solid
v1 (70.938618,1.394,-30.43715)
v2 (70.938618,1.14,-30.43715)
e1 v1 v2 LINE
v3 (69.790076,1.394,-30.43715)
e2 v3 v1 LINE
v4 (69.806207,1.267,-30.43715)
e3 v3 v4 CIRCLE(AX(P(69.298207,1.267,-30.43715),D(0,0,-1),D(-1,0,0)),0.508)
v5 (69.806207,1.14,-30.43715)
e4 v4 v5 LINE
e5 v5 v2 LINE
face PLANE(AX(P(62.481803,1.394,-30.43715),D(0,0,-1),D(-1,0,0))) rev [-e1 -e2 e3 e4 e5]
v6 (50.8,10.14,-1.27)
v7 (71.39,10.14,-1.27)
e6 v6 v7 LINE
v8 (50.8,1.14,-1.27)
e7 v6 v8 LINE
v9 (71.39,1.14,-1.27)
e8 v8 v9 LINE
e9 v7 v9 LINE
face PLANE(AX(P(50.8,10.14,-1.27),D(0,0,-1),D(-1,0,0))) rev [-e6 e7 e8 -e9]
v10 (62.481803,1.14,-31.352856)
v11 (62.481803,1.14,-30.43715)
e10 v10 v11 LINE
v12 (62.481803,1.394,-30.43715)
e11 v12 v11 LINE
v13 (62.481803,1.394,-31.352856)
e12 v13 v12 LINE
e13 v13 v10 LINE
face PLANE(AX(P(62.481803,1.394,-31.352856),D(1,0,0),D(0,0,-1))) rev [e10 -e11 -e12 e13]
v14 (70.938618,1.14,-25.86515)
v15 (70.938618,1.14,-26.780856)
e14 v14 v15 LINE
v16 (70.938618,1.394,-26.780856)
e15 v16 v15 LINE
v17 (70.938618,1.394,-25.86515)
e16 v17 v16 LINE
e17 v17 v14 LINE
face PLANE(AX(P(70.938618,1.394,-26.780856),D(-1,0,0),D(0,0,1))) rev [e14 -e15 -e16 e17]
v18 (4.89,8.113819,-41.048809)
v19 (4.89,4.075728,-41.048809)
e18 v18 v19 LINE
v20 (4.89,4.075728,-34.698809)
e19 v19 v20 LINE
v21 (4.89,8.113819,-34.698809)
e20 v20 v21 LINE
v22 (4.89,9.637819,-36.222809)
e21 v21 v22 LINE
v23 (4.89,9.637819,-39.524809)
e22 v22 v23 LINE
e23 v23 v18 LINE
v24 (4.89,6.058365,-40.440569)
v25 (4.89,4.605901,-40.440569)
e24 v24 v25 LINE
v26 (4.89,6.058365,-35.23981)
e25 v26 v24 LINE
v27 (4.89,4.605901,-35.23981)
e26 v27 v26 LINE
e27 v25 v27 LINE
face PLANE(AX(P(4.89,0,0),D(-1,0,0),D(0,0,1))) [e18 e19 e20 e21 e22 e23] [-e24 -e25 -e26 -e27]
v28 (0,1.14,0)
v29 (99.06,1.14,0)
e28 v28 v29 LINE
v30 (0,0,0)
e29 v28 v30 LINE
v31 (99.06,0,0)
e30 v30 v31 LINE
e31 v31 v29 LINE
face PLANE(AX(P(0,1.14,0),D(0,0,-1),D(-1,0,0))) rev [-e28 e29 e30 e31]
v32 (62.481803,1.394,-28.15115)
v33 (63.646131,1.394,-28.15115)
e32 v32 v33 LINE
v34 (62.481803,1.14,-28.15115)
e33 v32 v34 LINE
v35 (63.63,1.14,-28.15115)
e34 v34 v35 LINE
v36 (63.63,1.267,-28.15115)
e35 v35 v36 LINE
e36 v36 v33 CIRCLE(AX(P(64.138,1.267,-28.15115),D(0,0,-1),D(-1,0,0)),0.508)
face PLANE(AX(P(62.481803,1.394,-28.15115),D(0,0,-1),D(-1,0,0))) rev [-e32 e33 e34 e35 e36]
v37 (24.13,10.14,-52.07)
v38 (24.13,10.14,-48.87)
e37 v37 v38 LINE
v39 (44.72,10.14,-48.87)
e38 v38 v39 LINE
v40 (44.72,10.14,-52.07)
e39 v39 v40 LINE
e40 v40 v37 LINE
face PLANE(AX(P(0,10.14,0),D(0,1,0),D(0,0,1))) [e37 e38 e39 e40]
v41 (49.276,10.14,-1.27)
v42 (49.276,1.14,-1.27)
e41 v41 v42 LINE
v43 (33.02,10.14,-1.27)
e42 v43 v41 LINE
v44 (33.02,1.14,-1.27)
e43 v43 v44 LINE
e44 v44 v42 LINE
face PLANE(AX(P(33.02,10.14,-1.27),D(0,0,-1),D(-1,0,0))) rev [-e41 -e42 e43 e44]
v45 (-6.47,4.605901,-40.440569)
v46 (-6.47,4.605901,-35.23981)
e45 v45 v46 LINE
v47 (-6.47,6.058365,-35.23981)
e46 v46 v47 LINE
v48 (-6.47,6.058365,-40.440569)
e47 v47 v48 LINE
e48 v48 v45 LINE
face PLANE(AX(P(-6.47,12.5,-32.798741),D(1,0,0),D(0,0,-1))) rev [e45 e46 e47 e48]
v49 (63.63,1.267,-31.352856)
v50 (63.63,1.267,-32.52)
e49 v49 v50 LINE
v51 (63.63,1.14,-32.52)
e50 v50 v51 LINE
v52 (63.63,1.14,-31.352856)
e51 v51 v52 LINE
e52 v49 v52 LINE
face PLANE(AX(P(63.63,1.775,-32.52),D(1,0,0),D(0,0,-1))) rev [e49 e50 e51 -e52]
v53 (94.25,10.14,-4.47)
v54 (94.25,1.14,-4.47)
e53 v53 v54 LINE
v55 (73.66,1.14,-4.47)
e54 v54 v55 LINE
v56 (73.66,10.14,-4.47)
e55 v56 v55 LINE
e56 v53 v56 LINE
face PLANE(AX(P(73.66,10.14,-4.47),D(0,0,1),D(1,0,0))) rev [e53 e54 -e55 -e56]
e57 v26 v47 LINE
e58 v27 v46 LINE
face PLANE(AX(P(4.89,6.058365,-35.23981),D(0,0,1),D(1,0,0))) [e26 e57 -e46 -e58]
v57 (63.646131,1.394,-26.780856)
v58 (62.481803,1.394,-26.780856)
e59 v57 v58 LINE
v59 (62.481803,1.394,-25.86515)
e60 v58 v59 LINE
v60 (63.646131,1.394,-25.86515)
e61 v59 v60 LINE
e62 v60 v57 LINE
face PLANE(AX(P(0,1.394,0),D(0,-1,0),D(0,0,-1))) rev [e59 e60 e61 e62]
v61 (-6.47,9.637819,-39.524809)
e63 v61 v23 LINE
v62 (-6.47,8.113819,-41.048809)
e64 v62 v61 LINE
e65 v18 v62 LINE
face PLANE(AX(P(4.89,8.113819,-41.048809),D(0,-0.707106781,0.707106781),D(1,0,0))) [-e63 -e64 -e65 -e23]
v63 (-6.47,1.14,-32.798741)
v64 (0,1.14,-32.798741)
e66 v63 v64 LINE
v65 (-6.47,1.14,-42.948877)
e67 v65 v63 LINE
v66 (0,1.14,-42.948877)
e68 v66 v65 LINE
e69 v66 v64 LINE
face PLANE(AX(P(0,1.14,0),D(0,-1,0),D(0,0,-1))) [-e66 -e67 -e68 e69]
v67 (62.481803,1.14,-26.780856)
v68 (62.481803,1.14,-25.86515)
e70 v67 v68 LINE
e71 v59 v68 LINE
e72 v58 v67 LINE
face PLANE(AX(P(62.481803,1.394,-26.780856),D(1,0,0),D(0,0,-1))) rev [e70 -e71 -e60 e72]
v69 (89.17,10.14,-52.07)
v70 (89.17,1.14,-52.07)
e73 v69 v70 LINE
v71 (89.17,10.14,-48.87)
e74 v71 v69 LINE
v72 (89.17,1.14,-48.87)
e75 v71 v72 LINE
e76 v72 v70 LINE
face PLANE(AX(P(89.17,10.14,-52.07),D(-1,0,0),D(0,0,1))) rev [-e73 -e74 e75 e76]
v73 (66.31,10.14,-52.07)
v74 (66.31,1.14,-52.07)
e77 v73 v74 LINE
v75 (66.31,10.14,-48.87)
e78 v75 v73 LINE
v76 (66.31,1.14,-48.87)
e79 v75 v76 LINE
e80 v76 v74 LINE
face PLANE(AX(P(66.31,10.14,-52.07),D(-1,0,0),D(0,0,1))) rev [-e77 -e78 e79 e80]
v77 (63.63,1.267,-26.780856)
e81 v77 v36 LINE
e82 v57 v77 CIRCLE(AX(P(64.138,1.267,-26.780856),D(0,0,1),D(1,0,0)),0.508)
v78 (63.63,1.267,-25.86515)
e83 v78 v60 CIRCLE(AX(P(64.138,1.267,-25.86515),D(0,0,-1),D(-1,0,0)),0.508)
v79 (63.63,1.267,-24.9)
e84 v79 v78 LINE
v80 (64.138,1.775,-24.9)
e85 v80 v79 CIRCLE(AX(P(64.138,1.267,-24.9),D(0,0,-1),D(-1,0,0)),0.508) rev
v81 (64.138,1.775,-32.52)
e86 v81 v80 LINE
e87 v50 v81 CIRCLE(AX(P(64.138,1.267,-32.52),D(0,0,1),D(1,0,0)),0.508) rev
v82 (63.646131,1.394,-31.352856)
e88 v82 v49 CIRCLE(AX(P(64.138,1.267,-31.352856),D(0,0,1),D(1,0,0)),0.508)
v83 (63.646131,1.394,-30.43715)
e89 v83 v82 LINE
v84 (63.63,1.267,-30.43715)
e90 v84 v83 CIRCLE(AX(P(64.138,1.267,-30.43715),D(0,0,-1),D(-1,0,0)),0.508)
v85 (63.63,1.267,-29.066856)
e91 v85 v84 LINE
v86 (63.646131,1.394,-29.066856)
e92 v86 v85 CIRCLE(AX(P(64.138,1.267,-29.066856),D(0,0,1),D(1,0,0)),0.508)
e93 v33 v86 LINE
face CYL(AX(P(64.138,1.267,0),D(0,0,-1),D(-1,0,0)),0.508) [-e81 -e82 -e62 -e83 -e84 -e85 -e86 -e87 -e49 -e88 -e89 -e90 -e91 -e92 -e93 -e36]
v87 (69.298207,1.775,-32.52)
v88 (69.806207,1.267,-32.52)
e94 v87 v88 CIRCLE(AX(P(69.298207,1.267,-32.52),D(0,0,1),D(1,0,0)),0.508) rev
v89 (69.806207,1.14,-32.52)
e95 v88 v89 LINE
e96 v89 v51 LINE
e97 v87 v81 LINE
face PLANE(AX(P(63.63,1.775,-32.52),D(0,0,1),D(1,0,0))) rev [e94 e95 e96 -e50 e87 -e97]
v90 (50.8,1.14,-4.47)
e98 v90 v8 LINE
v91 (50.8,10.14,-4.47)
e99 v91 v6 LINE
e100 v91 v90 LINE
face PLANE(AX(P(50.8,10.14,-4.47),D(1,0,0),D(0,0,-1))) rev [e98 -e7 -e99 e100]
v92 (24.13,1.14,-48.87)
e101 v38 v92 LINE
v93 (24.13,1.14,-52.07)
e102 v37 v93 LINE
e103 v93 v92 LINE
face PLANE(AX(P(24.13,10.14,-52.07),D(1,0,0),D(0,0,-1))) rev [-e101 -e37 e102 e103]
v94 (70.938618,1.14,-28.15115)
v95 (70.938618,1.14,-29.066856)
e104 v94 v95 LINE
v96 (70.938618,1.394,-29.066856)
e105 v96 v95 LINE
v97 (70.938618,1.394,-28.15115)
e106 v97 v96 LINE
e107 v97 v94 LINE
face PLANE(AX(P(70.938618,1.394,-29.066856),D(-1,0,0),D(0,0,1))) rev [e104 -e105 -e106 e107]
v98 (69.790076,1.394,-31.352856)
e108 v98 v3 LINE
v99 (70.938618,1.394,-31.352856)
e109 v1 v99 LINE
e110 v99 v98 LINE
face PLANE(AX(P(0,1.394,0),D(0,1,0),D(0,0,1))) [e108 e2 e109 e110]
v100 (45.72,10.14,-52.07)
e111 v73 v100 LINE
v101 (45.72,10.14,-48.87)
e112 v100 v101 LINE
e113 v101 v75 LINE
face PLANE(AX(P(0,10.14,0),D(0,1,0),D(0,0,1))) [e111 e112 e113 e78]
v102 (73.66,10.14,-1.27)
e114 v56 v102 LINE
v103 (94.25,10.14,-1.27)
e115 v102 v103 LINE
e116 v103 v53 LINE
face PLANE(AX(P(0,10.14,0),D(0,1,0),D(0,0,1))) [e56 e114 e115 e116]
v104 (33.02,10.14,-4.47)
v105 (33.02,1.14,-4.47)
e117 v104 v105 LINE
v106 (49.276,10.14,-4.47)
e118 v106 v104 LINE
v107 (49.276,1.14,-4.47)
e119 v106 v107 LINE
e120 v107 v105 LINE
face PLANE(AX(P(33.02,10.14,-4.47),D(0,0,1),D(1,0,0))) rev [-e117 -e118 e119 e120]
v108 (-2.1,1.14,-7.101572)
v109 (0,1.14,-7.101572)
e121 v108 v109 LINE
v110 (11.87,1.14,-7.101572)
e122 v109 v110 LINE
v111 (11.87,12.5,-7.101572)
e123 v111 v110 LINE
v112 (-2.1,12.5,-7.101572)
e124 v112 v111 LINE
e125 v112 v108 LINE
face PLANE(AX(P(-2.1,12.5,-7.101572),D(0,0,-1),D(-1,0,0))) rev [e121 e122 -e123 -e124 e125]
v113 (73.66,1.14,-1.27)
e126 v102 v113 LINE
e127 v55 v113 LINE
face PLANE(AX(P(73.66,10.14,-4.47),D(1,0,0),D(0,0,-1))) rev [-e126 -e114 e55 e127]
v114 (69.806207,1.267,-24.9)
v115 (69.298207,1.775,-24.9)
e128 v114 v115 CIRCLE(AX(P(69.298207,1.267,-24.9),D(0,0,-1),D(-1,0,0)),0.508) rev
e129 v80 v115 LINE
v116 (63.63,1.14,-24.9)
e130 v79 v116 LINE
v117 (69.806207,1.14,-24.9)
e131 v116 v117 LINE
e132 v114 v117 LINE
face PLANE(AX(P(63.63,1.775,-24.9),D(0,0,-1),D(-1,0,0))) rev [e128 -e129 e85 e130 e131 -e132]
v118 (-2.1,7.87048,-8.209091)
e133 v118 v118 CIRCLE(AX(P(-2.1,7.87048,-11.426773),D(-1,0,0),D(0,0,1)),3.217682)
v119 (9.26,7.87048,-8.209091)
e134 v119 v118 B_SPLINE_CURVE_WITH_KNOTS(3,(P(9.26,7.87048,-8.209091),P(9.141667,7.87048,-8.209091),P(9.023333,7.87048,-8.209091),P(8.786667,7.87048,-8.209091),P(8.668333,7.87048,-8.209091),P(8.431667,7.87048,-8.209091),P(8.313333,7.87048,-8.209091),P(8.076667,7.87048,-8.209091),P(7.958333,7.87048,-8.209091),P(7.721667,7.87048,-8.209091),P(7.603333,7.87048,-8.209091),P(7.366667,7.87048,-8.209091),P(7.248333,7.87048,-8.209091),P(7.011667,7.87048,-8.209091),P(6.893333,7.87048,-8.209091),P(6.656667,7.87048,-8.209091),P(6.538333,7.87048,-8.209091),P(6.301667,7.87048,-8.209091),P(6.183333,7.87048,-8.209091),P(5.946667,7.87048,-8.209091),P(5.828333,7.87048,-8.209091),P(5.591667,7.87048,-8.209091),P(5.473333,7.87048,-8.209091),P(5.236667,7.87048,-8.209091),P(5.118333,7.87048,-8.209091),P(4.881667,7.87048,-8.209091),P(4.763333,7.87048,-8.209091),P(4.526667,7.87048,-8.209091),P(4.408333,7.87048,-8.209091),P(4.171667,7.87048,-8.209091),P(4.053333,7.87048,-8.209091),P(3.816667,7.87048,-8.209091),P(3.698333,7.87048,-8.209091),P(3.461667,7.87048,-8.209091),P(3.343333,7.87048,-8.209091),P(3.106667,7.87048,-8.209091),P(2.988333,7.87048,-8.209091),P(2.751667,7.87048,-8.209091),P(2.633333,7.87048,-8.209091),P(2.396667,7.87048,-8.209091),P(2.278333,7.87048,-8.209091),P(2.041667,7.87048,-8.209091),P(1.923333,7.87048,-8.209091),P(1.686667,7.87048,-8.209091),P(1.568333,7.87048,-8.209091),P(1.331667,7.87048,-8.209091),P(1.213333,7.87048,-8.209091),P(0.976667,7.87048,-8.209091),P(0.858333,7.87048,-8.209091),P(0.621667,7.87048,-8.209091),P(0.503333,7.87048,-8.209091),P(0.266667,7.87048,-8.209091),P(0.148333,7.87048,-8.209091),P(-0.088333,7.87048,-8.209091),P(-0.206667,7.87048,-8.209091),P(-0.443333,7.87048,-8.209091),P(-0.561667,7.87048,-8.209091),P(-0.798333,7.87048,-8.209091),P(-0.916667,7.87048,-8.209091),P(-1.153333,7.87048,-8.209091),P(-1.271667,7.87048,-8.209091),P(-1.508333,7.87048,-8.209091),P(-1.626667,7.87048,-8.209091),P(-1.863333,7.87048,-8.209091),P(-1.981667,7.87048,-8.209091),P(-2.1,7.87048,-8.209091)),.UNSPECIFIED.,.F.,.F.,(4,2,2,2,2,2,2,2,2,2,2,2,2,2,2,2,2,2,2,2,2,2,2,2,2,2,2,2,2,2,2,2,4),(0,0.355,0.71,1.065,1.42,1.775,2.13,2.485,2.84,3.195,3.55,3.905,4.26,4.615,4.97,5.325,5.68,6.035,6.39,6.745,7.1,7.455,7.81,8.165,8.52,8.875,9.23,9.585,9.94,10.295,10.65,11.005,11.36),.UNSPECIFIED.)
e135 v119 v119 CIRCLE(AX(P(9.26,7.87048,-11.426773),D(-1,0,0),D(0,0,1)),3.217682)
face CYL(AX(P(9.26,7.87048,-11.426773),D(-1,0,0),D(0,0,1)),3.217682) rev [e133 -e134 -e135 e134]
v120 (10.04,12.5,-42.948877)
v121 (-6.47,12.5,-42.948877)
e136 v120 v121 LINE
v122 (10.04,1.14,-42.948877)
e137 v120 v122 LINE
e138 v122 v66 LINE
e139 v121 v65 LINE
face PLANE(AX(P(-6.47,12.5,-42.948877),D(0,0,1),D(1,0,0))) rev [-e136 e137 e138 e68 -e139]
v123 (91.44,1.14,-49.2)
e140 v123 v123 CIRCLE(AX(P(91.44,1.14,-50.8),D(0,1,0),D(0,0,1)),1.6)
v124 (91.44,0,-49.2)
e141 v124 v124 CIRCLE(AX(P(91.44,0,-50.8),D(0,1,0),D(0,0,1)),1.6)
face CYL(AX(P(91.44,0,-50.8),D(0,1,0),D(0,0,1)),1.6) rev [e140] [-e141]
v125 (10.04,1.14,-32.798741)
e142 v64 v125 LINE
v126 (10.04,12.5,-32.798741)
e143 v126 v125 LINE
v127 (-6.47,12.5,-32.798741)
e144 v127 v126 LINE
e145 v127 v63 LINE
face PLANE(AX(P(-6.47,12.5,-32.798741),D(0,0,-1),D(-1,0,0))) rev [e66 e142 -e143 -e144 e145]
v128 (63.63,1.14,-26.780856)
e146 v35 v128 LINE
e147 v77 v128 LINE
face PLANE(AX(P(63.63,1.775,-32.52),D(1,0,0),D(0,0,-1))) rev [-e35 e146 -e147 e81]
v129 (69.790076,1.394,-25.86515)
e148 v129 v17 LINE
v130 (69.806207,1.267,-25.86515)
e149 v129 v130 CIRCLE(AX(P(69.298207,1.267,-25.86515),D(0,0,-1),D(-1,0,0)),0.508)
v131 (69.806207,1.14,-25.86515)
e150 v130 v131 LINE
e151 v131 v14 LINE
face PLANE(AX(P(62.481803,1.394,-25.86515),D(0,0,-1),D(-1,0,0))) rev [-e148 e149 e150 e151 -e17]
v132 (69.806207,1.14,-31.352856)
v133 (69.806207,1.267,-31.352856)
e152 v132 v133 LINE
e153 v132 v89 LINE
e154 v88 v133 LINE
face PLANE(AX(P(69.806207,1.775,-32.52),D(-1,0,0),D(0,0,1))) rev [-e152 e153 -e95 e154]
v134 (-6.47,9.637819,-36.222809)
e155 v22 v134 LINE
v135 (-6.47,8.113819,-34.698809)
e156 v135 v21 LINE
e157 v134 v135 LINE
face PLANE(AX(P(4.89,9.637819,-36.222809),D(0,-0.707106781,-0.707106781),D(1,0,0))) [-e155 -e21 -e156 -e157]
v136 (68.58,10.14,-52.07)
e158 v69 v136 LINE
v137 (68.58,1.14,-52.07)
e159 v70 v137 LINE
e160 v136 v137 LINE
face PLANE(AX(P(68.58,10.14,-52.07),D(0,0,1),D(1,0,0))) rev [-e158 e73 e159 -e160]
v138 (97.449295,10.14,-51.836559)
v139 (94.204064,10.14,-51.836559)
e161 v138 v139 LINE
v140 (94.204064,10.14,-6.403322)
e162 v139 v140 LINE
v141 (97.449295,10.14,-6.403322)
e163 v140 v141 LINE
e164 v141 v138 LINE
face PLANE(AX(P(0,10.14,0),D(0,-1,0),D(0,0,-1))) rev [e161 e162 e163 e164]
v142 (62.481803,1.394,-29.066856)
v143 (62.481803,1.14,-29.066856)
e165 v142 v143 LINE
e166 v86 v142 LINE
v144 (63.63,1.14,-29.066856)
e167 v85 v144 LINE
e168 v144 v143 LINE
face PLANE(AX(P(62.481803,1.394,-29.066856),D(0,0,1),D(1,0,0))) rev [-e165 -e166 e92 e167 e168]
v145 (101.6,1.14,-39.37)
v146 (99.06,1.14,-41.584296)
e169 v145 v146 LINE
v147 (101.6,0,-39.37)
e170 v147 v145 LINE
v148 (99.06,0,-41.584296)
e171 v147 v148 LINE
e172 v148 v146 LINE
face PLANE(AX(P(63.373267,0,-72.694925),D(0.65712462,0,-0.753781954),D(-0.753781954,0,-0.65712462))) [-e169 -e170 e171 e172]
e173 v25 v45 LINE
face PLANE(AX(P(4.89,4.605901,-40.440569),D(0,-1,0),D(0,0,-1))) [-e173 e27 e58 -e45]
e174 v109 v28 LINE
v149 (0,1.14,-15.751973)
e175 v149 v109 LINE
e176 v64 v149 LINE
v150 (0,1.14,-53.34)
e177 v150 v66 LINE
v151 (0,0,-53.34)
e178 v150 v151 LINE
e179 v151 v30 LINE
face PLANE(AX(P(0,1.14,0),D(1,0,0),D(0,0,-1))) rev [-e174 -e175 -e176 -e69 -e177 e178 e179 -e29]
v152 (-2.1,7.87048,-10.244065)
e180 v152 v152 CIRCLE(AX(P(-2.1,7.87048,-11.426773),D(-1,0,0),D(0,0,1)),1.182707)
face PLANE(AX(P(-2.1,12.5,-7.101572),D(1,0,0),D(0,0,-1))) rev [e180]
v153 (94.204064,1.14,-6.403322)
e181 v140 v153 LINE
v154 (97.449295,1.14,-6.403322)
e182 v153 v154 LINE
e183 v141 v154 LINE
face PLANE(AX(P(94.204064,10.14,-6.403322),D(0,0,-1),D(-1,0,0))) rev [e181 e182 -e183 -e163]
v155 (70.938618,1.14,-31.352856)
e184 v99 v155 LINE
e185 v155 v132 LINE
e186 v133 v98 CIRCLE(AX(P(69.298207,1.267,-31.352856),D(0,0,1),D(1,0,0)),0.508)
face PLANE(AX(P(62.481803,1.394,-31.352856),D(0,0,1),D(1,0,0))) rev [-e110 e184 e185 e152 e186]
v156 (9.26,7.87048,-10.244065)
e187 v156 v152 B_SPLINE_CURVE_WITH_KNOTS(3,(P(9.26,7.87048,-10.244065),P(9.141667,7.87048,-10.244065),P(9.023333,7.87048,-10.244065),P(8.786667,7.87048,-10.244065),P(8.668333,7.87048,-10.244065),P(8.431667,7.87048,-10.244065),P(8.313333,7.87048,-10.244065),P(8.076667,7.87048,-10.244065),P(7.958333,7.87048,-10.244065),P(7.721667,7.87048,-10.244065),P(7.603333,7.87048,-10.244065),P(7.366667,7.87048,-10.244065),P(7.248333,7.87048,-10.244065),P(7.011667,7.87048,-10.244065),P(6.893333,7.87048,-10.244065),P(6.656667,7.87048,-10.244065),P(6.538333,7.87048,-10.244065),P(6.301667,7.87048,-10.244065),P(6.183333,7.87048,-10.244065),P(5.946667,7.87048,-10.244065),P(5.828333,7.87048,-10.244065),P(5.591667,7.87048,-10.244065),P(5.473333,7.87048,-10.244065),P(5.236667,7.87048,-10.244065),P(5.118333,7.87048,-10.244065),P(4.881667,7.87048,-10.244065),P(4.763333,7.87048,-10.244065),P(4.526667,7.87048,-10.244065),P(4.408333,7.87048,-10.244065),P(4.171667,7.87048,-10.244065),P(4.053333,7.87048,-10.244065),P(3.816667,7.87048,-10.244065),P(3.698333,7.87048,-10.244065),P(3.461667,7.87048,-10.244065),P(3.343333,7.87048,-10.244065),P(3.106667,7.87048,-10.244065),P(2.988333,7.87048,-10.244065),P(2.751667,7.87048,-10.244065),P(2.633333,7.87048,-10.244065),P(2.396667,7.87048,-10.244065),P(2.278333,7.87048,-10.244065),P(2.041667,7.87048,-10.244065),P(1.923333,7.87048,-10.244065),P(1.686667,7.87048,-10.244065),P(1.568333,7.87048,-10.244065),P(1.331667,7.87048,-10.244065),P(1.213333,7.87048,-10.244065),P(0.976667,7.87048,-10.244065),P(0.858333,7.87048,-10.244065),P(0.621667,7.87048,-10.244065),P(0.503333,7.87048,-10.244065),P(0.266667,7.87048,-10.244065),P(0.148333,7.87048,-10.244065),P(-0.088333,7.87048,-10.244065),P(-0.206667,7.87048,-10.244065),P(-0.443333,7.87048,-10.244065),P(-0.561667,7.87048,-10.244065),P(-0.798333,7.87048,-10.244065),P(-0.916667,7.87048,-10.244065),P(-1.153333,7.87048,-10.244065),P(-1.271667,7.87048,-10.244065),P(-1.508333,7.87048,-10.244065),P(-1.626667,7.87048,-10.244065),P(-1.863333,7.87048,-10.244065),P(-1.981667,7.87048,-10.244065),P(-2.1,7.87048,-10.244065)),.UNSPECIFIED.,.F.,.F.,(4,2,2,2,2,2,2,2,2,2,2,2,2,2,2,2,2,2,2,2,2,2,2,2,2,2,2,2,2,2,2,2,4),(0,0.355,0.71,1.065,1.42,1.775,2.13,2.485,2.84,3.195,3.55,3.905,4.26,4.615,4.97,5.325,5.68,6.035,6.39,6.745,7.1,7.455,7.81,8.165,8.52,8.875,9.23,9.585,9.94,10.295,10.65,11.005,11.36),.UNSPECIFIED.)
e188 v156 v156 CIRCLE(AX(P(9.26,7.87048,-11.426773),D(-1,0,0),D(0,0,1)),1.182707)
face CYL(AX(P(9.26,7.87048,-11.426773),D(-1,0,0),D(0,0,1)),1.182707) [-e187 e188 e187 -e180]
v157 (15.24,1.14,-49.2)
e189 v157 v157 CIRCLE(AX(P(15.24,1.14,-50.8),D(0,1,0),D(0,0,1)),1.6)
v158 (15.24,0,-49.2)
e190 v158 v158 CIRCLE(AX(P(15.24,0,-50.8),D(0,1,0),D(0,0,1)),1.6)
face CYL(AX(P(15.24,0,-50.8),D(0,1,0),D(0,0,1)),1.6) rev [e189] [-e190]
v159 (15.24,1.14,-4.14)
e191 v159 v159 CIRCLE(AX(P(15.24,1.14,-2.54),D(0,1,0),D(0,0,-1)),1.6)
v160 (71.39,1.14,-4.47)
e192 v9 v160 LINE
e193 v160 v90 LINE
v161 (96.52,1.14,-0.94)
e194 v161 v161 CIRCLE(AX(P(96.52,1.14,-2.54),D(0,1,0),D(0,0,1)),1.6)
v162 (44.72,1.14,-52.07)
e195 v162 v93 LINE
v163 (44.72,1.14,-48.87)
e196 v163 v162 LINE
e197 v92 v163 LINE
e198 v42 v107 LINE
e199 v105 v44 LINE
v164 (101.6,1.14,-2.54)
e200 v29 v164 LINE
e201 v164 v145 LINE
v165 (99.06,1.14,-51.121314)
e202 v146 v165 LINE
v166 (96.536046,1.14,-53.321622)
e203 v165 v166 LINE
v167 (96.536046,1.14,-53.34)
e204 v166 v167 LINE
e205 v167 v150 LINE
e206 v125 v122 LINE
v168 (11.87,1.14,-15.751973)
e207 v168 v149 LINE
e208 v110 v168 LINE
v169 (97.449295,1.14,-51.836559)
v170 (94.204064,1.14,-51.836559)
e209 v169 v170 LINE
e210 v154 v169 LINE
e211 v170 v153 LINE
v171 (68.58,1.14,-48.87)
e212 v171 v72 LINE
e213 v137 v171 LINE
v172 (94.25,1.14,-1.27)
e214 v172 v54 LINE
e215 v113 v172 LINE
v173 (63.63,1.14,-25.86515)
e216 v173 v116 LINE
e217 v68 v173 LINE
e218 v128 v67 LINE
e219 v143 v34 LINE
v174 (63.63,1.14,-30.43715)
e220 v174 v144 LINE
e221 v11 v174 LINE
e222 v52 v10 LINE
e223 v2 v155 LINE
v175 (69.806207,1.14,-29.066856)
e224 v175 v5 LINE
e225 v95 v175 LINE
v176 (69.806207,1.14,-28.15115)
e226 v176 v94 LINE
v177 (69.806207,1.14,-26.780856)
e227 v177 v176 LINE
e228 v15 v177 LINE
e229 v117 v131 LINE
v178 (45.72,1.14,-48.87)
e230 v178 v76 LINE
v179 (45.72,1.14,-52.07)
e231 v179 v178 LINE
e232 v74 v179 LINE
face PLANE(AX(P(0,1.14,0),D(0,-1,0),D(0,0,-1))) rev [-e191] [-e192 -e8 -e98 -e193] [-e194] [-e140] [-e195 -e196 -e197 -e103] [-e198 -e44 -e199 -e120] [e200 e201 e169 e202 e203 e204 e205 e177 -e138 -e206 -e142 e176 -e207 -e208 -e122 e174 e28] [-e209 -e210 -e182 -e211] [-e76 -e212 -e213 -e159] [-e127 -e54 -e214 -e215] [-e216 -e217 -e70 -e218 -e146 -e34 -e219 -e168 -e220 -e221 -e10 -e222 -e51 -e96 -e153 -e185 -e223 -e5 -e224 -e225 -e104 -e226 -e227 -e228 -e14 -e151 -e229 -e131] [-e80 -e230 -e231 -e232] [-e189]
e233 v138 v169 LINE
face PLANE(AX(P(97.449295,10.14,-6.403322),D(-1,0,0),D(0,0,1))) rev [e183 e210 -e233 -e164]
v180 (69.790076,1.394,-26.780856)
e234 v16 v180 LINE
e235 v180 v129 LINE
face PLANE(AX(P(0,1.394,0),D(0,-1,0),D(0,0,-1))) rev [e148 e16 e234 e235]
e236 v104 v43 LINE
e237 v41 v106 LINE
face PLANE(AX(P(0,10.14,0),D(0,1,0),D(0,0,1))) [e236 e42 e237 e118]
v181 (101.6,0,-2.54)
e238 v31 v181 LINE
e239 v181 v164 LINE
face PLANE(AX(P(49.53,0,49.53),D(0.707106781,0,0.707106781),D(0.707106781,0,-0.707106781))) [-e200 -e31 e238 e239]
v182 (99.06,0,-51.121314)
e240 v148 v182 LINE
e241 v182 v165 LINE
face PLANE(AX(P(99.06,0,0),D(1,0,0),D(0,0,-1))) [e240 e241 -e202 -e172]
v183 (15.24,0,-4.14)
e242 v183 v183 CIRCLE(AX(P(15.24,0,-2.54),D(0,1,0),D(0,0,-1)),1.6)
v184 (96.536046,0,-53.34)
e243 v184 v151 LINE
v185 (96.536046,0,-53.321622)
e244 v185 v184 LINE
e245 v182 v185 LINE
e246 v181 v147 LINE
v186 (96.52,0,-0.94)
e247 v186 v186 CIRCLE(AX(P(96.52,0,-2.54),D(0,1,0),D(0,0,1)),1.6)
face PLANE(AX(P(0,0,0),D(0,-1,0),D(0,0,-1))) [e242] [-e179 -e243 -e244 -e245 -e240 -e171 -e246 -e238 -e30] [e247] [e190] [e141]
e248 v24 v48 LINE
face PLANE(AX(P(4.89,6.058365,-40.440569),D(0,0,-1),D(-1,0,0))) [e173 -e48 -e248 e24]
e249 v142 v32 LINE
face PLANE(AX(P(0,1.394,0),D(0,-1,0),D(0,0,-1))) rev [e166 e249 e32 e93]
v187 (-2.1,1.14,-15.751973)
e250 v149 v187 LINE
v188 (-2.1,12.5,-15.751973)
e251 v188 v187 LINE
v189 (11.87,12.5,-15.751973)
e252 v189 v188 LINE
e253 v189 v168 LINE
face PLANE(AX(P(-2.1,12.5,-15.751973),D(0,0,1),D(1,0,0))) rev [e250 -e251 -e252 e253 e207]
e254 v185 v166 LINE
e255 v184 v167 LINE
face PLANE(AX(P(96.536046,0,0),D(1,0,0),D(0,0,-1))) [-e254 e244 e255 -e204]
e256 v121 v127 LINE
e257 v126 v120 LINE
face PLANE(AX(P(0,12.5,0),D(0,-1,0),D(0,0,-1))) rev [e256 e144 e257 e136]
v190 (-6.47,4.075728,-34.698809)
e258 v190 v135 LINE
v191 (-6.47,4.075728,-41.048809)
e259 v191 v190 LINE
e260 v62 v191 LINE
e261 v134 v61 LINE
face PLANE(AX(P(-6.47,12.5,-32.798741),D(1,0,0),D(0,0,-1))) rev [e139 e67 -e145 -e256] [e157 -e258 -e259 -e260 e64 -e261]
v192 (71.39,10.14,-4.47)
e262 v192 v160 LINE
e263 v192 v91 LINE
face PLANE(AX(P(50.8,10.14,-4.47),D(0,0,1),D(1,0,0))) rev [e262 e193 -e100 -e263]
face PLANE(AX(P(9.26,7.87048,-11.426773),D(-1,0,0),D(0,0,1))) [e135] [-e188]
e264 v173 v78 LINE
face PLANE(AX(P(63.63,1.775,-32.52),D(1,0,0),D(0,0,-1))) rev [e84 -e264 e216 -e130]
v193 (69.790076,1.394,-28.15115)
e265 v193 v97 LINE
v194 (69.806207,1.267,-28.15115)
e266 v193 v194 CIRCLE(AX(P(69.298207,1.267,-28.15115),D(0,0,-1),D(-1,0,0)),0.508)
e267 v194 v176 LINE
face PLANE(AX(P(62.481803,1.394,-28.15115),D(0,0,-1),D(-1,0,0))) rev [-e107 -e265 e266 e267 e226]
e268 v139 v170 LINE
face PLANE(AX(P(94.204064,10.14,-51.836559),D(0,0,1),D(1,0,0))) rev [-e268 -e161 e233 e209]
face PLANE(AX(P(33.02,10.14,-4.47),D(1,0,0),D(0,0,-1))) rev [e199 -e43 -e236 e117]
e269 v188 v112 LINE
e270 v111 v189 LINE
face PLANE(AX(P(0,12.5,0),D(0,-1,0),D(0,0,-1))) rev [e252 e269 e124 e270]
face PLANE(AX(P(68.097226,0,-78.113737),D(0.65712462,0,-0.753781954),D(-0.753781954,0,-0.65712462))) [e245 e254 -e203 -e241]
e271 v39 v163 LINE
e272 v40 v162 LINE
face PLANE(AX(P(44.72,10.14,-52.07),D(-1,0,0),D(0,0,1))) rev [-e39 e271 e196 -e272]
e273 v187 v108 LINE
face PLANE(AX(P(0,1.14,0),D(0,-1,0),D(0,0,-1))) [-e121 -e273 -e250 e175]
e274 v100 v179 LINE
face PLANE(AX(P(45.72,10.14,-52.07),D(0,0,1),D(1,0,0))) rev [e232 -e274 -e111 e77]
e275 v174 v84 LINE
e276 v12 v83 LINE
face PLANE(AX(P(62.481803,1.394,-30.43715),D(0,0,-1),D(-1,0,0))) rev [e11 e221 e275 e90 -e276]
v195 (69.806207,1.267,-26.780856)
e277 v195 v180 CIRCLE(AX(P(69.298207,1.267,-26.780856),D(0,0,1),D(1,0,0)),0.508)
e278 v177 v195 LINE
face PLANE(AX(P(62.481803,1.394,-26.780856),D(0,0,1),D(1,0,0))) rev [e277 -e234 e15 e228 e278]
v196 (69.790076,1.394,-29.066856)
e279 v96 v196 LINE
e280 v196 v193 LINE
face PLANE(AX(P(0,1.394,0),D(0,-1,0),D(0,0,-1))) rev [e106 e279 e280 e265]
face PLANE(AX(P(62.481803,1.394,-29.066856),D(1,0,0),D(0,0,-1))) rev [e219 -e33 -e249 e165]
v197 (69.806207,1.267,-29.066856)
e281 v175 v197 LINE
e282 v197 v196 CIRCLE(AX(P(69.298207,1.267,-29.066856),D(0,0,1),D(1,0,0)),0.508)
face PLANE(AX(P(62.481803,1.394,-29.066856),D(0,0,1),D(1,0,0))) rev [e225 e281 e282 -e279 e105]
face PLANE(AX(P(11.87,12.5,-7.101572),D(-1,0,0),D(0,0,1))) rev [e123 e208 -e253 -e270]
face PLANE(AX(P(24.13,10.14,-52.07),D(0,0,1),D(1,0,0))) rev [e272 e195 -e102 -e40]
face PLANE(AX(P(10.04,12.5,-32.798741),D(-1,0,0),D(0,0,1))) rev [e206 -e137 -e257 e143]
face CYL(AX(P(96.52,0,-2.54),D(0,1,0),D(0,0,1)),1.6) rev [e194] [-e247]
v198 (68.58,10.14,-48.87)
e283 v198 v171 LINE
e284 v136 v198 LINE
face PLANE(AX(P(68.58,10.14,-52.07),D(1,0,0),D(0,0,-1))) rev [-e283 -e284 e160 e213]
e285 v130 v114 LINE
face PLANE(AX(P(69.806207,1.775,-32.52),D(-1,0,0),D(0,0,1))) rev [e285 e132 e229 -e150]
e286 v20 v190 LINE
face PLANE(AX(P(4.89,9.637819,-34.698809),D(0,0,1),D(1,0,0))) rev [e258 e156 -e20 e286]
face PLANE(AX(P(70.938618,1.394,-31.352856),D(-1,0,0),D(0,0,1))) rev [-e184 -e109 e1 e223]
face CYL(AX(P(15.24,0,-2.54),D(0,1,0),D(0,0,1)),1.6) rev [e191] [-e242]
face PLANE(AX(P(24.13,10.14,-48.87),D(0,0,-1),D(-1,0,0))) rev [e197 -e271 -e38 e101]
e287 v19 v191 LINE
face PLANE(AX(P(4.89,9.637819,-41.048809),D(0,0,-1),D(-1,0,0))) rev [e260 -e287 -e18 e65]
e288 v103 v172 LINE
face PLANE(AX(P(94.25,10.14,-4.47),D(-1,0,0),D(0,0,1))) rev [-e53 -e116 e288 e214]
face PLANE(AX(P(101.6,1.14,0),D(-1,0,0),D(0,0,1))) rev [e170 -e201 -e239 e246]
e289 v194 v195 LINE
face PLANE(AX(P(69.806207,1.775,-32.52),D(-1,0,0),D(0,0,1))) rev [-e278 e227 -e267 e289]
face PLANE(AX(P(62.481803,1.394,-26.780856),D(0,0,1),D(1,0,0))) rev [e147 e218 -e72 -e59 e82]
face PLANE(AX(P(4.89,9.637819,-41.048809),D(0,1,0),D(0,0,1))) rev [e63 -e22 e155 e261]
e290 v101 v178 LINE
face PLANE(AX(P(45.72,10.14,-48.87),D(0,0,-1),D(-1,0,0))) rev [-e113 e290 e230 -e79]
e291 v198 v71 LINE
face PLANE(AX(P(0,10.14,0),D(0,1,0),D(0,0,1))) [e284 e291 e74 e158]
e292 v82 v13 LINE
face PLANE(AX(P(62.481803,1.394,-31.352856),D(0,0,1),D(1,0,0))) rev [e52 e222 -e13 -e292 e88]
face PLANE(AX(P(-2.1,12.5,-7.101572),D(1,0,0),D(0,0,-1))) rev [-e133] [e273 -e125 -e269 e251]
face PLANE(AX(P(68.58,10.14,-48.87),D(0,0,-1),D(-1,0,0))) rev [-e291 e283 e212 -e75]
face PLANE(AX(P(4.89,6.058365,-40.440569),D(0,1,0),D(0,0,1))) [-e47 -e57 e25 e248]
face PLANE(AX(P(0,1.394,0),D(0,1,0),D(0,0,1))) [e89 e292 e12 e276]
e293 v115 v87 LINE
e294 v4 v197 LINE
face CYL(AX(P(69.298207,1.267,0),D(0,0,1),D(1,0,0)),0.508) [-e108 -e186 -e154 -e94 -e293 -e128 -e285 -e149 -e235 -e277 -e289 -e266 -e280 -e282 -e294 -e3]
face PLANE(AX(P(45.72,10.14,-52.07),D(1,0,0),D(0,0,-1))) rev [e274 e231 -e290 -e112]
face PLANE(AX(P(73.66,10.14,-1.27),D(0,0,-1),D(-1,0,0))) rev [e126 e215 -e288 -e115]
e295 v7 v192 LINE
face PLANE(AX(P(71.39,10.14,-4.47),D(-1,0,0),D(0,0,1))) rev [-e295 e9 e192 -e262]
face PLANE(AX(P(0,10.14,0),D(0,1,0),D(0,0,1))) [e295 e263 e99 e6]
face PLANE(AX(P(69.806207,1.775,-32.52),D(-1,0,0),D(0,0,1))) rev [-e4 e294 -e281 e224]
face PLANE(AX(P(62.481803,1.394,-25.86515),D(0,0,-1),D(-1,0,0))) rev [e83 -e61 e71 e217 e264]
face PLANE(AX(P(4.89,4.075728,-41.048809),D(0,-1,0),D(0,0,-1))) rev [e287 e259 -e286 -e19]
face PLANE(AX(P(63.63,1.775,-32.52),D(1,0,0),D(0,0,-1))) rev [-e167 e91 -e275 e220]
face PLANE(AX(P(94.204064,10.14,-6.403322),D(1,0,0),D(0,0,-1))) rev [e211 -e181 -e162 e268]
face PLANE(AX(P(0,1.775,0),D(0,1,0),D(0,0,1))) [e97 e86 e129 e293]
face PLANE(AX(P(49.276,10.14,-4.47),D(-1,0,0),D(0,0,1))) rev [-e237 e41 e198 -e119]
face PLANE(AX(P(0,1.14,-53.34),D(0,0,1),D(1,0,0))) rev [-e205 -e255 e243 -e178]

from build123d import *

# Parameters (mm, degrees)
SKETCH2_W           = 101.6
SKETCH2_H           = 53.34
BOSS_EXTRUDE1_DEPTH = 1.14
SKETCH3_R           = 1.6
CUT_EXTRUDE1_DEPTH  = 115.756329673
SKETCH4_W           = 20.59
SKETCH4_H           = 3.2
SKETCH4_W_2         = 16.256
BOSS_EXTRUDE2_DEPTH = 9
CUT_EXTRUDE2_DEPTH  = 116.10306512
SKETCH6_R           = 1.6
CUT_EXTRUDE3_DEPTH  = 116.10306512
SKETCH7_W           = 3.245231175
SKETCH7_H           = 45.43323645
BOSS_EXTRUDE3_DEPTH = 9
SKETCH8_W           = 16.51
SKETCH8_H           = 10.150135712
SKETCH8_W_2         = 13.97
SKETCH8_H_2         = 8.650400862
BOSS_EXTRUDE4_DEPTH = 11.36
SKETCH9_R           = 3.217681585
SKETCH9_R_2         = 1.182707285
CUT_EXTRUDE4_DEPTH  = 11.36
SKETCH10_W          = 6.35
SKETCH10_H          = 5.56209116
SKETCH10_W_2        = 5.200759748
SKETCH10_H_2        = 1.452464435
CUT_EXTRUDE5_DEPTH  = 11.36
CHAMFER1_SIZE       = 1.524
SKETCH11_W          = 6.176206758
SKETCH11_H          = 7.62
BOSS_EXTRUDE5_DEPTH = 0.635
SKETCH12_W          = 8.456815018
SKETCH12_H          = 0.915706085
BOSS_EXTRUDE6_DEPTH = 0.254
FILLET1_R           = 0.508


with BuildPart() as part:
    # Sketch2 → Boss-Extrude1 (new body)
    with BuildSketch(Plane(origin=(0, 0, 0), x_dir=(1, 0, 0), z_dir=(0, 1, 0))):
        with Locations((50.8, 26.67)):
            Rectangle(SKETCH2_W, SKETCH2_H)
    extrude(amount=BOSS_EXTRUDE1_DEPTH)

    # Sketch3 → Cut-Extrude1 (cut, through all)
    with BuildSketch(Plane(origin=(0, 1.14, 0), x_dir=(1, 0, 0), z_dir=(0, 1, 0))):
        with Locations(Location((15.24, 50.8, 0), (0, 0, 270))):
            Circle(SKETCH3_R)
        with Locations(Location((15.24, 2.54, 0), (0, 0, 90))):
            Circle(SKETCH3_R)
    extrude(amount=-CUT_EXTRUDE1_DEPTH, mode=Mode.SUBTRACT)

    # Sketch4 → Boss-Extrude2 (add)
    with BuildSketch(Plane(origin=(0, 1.14, 0), x_dir=(1, 0, 0), z_dir=(0, 1, 0))):
        with Locations((56.015, 50.47)):
            Rectangle(SKETCH4_W, SKETCH4_H)
        with Locations((34.425, 50.47)):
            Rectangle(SKETCH4_W, SKETCH4_H)
        with Locations((78.875, 50.47)):
            Rectangle(SKETCH4_W, SKETCH4_H)
        with Locations((83.955, 2.87)):
            Rectangle(SKETCH4_W, SKETCH4_H)
        with Locations((61.095, 2.87)):
            Rectangle(SKETCH4_W, SKETCH4_H)
        with Locations((41.148, 2.87)):
            Rectangle(SKETCH4_W_2, SKETCH4_H)
    extrude(amount=BOSS_EXTRUDE2_DEPTH)

    # Sketch5 → Cut-Extrude2 (cut, through all)
    with BuildSketch(Plane(origin=(0, 1.14, 0), x_dir=(1, 0, 0), z_dir=(0, 1, 0))):
        Polygon((99.06, 0), (101.6, 0), (101.6, 2.54), align=None)
        Polygon((99.06, 41.584296227), (101.6, 39.37), (101.6, 53.321621524), (101.6, 53.34), (96.536046111, 53.34), (96.536046111, 53.321621524), (99.06, 51.121313818), align=None)
    extrude(amount=-CUT_EXTRUDE2_DEPTH, mode=Mode.SUBTRACT)

    # Sketch6 → Cut-Extrude3 (cut, through all)
    with BuildSketch(Plane(origin=(0, 1.14, 0), x_dir=(1, 0, 0), z_dir=(0, 1, 0))):
        with Locations(Location((96.52, 2.54, 0), (0, 0, 270))):
            Circle(SKETCH6_R)
        with Locations(Location((91.44, 50.8, 0), (0, 0, 270))):
            Circle(SKETCH6_R)
    extrude(amount=-CUT_EXTRUDE3_DEPTH, mode=Mode.SUBTRACT)

    # Sketch7 → Boss-Extrude3 (add)
    with BuildSketch(Plane(origin=(0, 1.14, 0), x_dir=(1, 0, 0), z_dir=(0, 1, 0))):
        with Locations((95.826679511, 29.119940639)):
            Rectangle(SKETCH7_W, SKETCH7_H)
    extrude(amount=BOSS_EXTRUDE3_DEPTH)

    # Sketch8 → Boss-Extrude4 (add)
    with BuildSketch(Plane(origin=(0, 1.14, 0), x_dir=(1, 0, 0), z_dir=(0, 1, 0))):
        with Locations((1.785, 37.873809091)):
            Rectangle(SKETCH8_W, SKETCH8_H)
        with Locations((4.885, 11.42677262)):
            Rectangle(SKETCH8_W_2, SKETCH8_H_2)
    extrude(amount=BOSS_EXTRUDE4_DEPTH)

    # Sketch9 → Cut-Extrude4 (cut)
    with BuildSketch(Plane.ZY.offset(2.1)):
        with Locations((-11.42677262, 7.870480003)):
            Circle(SKETCH9_R)
        with Locations((-11.42677262, 7.870480003)):
            Circle(SKETCH9_R_2, mode=Mode.SUBTRACT)
    extrude(amount=-CUT_EXTRUDE4_DEPTH, mode=Mode.SUBTRACT)

    # Sketch10 → Cut-Extrude5 (cut)
    with BuildSketch(Plane.ZY.offset(6.47)):
        with Locations((-37.873809091, 6.856773581)):
            Rectangle(SKETCH10_W, SKETCH10_H)
        with Locations((-37.84018947, 5.332133236)):
            Rectangle(SKETCH10_W_2, SKETCH10_H_2, mode=Mode.SUBTRACT)
    extrude(amount=-CUT_EXTRUDE5_DEPTH, mode=Mode.SUBTRACT)

    # Chamfer1
    chamfer1_edges = [part.edges().sort_by_distance(p)[0] for p in [
        (-0.79, 9.637819161, -41.048809091),
        (-0.79, 9.637819161, -34.698809091),
    ]]
    chamfer(chamfer1_edges, length=CHAMFER1_SIZE)

    # Sketch11 → Boss-Extrude5 (add)
    with BuildSketch(Plane(origin=(0, 1.14, 0), x_dir=(1, 0, 0), z_dir=(0, 1, 0))):
        with Locations((66.718103379, 28.71)):
            Rectangle(SKETCH11_W, SKETCH11_H)
    extrude(amount=BOSS_EXTRUDE5_DEPTH)

    # Sketch12 → Boss-Extrude6 (add)
    with BuildSketch(Plane(origin=(0, 1.14, 0), x_dir=(1, 0, 0), z_dir=(0, 1, 0))):
        with Locations((66.71021047, 28.609003409)):
            Rectangle(SKETCH12_W, SKETCH12_H)
        with Locations((66.71021047, 30.895003409)):
            Rectangle(SKETCH12_W, SKETCH12_H)
        with Locations((66.71021047, 26.323003408)):
            Rectangle(SKETCH12_W, SKETCH12_H)
    extrude(amount=BOSS_EXTRUDE6_DEPTH)

    # Fillet1
    # the kernel refuses this fillet: 0.508 mm, written as the material it takes off along each edge
    with BuildSketch(Plane(origin=(69.806206758, 1.775, -33.79), x_dir=(0, -1, 0), z_dir=(0, 0, 1))) as fillet1_piece_1_section:
        with BuildLine():
            CenterArc((FILLET1_R, -FILLET1_R), FILLET1_R, 90, 90)
            Line((0, -FILLET1_R), (0, 0))
            Line((0, 0), (FILLET1_R, 0))
        make_face()
    fillet1_piece_1 = extrude(amount=10.16, mode=Mode.PRIVATE)
    fillet1_piece_1 = split(fillet1_piece_1, bisect_by=Plane(origin=(69.801380886, 1.362351692, -31.352856451), z_dir=(0, 0, -1)), keep=Keep.TOP, mode=Mode.PRIVATE)
    add(fillet1_piece_1, mode=Mode.SUBTRACT)
    with BuildSketch(Plane(origin=(69.806206758, 1.775, -33.79), x_dir=(0, -1, 0), z_dir=(0, 0, 1))) as fillet1_piece_2_section:
        with BuildLine():
            CenterArc((FILLET1_R, -FILLET1_R), FILLET1_R, 90, 90)
            Line((0, -FILLET1_R), (0, 0))
            Line((0, 0), (FILLET1_R, 0))
        make_face()
    fillet1_piece_2 = extrude(amount=10.16, mode=Mode.PRIVATE)
    fillet1_piece_2 = split(fillet1_piece_2, bisect_by=Plane(origin=(69.691388297, 1.394, -30.895003408), z_dir=(0, 1, 0)), keep=Keep.TOP, mode=Mode.PRIVATE)
    add(fillet1_piece_2, mode=Mode.SUBTRACT)
    with BuildSketch(Plane(origin=(69.806206758, 1.775, -33.79), x_dir=(0, -1, 0), z_dir=(0, 0, 1))) as fillet1_piece_3_section:
        with BuildLine():
            CenterArc((FILLET1_R, -FILLET1_R), FILLET1_R, 90, 90)
            Line((0, -FILLET1_R), (0, 0))
            Line((0, 0), (FILLET1_R, 0))
        make_face()
    fillet1_piece_3 = extrude(amount=10.16, mode=Mode.PRIVATE)
    fillet1_piece_3 = split(fillet1_piece_3, bisect_by=Plane(origin=(69.801380886, 1.362351692, -29.066856451), z_dir=(0, 0, -1)), keep=Keep.TOP, mode=Mode.PRIVATE)
    fillet1_piece_3 = split(fillet1_piece_3, bisect_by=Plane(origin=(69.801380886, 1.362351692, -30.437150366), z_dir=(0, 0, 1)), keep=Keep.TOP, mode=Mode.PRIVATE)
    add(fillet1_piece_3, mode=Mode.SUBTRACT)
    with BuildSketch(Plane(origin=(69.806206758, 1.775, -33.79), x_dir=(0, -1, 0), z_dir=(0, 0, 1))) as fillet1_piece_4_section:
        with BuildLine():
            CenterArc((FILLET1_R, -FILLET1_R), FILLET1_R, 90, 90)
            Line((0, -FILLET1_R), (0, 0))
            Line((0, 0), (FILLET1_R, 0))
        make_face()
    fillet1_piece_4 = extrude(amount=10.16, mode=Mode.PRIVATE)
    fillet1_piece_4 = split(fillet1_piece_4, bisect_by=Plane(origin=(69.801380886, 1.362351692, -26.780856451), z_dir=(0, 0, -1)), keep=Keep.TOP, mode=Mode.PRIVATE)
    fillet1_piece_4 = split(fillet1_piece_4, bisect_by=Plane(origin=(69.801380886, 1.362351692, -28.151150366), z_dir=(0, 0, 1)), keep=Keep.TOP, mode=Mode.PRIVATE)
    add(fillet1_piece_4, mode=Mode.SUBTRACT)
    with BuildSketch(Plane(origin=(69.806206758, 1.775, -33.79), x_dir=(0, -1, 0), z_dir=(0, 0, 1))) as fillet1_piece_5_section:
        with BuildLine():
            CenterArc((FILLET1_R, -FILLET1_R), FILLET1_R, 90, 90)
            Line((0, -FILLET1_R), (0, 0))
            Line((0, 0), (FILLET1_R, 0))
        make_face()
    fillet1_piece_5 = extrude(amount=10.16, mode=Mode.PRIVATE)
    fillet1_piece_5 = split(fillet1_piece_5, bisect_by=Plane(origin=(69.801380886, 1.362351692, -25.865150366), z_dir=(0, 0, 1)), keep=Keep.TOP, mode=Mode.PRIVATE)
    add(fillet1_piece_5, mode=Mode.SUBTRACT)
    with BuildSketch(Plane(origin=(63.63, 1.775, -23.63), x_dir=(0, -1, 0), z_dir=(0, 0, -1))) as fillet1_piece_6_section:
        with BuildLine():
            CenterArc((FILLET1_R, -FILLET1_R), FILLET1_R, 90, 90)
            Line((0, -FILLET1_R), (0, 0))
            Line((0, 0), (FILLET1_R, 0))
        make_face()
    fillet1_piece_6 = extrude(amount=10.16, mode=Mode.PRIVATE)
    fillet1_piece_6 = split(fillet1_piece_6, bisect_by=Plane(origin=(63.634825872, 1.362351692, -25.865150366), z_dir=(0, 0, 1)), keep=Keep.TOP, mode=Mode.PRIVATE)
    add(fillet1_piece_6, mode=Mode.SUBTRACT)
    with BuildSketch(Plane(origin=(63.63, 1.775, -23.63), x_dir=(0, -1, 0), z_dir=(0, 0, -1))) as fillet1_piece_7_section:
        with BuildLine():
            CenterArc((FILLET1_R, -FILLET1_R), FILLET1_R, 90, 90)
            Line((0, -FILLET1_R), (0, 0))
            Line((0, 0), (FILLET1_R, 0))
        make_face()
    fillet1_piece_7 = extrude(amount=10.16, mode=Mode.PRIVATE)
    fillet1_piece_7 = split(fillet1_piece_7, bisect_by=Plane(origin=(63.744818461, 1.394, -26.323003408), z_dir=(0, 1, 0)), keep=Keep.TOP, mode=Mode.PRIVATE)
    add(fillet1_piece_7, mode=Mode.SUBTRACT)
    with BuildSketch(Plane(origin=(63.63, 1.775, -23.63), x_dir=(0, -1, 0), z_dir=(0, 0, -1))) as fillet1_piece_8_section:
        with BuildLine():
            CenterArc((FILLET1_R, -FILLET1_R), FILLET1_R, 90, 90)
            Line((0, -FILLET1_R), (0, 0))
            Line((0, 0), (FILLET1_R, 0))
        make_face()
    fillet1_piece_8 = extrude(amount=10.16, mode=Mode.PRIVATE)
    fillet1_piece_8 = split(fillet1_piece_8, bisect_by=Plane(origin=(63.634825872, 1.362351692, -28.151150366), z_dir=(0, 0, 1)), keep=Keep.TOP, mode=Mode.PRIVATE)
    fillet1_piece_8 = split(fillet1_piece_8, bisect_by=Plane(origin=(63.634825872, 1.362351692, -26.780856451), z_dir=(0, 0, -1)), keep=Keep.TOP, mode=Mode.PRIVATE)
    add(fillet1_piece_8, mode=Mode.SUBTRACT)
    with BuildSketch(Plane(origin=(63.63, 1.775, -23.63), x_dir=(0, -1, 0), z_dir=(0, 0, -1))) as fillet1_piece_9_section:
        with BuildLine():
            CenterArc((FILLET1_R, -FILLET1_R), FILLET1_R, 90, 90)
            Line((0, -FILLET1_R), (0, 0))
            Line((0, 0), (FILLET1_R, 0))
        make_face()
    fillet1_piece_9 = extrude(amount=10.16, mode=Mode.PRIVATE)
    fillet1_piece_9 = split(fillet1_piece_9, bisect_by=Plane(origin=(63.634825872, 1.362351692, -30.437150366), z_dir=(0, 0, 1)), keep=Keep.TOP, mode=Mode.PRIVATE)
    fillet1_piece_9 = split(fillet1_piece_9, bisect_by=Plane(origin=(63.634825872, 1.362351692, -29.066856451), z_dir=(0, 0, -1)), keep=Keep.TOP, mode=Mode.PRIVATE)
    add(fillet1_piece_9, mode=Mode.SUBTRACT)
    with BuildSketch(Plane(origin=(63.63, 1.775, -23.63), x_dir=(0, -1, 0), z_dir=(0, 0, -1))) as fillet1_piece_10_section:
        with BuildLine():
            CenterArc((FILLET1_R, -FILLET1_R), FILLET1_R, 90, 90)
            Line((0, -FILLET1_R), (0, 0))
            Line((0, 0), (FILLET1_R, 0))
        make_face()
    fillet1_piece_10 = extrude(amount=10.16, mode=Mode.PRIVATE)
    fillet1_piece_10 = split(fillet1_piece_10, bisect_by=Plane(origin=(63.634825872, 1.362351692, -31.352856451), z_dir=(0, 0, -1)), keep=Keep.TOP, mode=Mode.PRIVATE)
    add(fillet1_piece_10, mode=Mode.SUBTRACT)


solid = part.part
